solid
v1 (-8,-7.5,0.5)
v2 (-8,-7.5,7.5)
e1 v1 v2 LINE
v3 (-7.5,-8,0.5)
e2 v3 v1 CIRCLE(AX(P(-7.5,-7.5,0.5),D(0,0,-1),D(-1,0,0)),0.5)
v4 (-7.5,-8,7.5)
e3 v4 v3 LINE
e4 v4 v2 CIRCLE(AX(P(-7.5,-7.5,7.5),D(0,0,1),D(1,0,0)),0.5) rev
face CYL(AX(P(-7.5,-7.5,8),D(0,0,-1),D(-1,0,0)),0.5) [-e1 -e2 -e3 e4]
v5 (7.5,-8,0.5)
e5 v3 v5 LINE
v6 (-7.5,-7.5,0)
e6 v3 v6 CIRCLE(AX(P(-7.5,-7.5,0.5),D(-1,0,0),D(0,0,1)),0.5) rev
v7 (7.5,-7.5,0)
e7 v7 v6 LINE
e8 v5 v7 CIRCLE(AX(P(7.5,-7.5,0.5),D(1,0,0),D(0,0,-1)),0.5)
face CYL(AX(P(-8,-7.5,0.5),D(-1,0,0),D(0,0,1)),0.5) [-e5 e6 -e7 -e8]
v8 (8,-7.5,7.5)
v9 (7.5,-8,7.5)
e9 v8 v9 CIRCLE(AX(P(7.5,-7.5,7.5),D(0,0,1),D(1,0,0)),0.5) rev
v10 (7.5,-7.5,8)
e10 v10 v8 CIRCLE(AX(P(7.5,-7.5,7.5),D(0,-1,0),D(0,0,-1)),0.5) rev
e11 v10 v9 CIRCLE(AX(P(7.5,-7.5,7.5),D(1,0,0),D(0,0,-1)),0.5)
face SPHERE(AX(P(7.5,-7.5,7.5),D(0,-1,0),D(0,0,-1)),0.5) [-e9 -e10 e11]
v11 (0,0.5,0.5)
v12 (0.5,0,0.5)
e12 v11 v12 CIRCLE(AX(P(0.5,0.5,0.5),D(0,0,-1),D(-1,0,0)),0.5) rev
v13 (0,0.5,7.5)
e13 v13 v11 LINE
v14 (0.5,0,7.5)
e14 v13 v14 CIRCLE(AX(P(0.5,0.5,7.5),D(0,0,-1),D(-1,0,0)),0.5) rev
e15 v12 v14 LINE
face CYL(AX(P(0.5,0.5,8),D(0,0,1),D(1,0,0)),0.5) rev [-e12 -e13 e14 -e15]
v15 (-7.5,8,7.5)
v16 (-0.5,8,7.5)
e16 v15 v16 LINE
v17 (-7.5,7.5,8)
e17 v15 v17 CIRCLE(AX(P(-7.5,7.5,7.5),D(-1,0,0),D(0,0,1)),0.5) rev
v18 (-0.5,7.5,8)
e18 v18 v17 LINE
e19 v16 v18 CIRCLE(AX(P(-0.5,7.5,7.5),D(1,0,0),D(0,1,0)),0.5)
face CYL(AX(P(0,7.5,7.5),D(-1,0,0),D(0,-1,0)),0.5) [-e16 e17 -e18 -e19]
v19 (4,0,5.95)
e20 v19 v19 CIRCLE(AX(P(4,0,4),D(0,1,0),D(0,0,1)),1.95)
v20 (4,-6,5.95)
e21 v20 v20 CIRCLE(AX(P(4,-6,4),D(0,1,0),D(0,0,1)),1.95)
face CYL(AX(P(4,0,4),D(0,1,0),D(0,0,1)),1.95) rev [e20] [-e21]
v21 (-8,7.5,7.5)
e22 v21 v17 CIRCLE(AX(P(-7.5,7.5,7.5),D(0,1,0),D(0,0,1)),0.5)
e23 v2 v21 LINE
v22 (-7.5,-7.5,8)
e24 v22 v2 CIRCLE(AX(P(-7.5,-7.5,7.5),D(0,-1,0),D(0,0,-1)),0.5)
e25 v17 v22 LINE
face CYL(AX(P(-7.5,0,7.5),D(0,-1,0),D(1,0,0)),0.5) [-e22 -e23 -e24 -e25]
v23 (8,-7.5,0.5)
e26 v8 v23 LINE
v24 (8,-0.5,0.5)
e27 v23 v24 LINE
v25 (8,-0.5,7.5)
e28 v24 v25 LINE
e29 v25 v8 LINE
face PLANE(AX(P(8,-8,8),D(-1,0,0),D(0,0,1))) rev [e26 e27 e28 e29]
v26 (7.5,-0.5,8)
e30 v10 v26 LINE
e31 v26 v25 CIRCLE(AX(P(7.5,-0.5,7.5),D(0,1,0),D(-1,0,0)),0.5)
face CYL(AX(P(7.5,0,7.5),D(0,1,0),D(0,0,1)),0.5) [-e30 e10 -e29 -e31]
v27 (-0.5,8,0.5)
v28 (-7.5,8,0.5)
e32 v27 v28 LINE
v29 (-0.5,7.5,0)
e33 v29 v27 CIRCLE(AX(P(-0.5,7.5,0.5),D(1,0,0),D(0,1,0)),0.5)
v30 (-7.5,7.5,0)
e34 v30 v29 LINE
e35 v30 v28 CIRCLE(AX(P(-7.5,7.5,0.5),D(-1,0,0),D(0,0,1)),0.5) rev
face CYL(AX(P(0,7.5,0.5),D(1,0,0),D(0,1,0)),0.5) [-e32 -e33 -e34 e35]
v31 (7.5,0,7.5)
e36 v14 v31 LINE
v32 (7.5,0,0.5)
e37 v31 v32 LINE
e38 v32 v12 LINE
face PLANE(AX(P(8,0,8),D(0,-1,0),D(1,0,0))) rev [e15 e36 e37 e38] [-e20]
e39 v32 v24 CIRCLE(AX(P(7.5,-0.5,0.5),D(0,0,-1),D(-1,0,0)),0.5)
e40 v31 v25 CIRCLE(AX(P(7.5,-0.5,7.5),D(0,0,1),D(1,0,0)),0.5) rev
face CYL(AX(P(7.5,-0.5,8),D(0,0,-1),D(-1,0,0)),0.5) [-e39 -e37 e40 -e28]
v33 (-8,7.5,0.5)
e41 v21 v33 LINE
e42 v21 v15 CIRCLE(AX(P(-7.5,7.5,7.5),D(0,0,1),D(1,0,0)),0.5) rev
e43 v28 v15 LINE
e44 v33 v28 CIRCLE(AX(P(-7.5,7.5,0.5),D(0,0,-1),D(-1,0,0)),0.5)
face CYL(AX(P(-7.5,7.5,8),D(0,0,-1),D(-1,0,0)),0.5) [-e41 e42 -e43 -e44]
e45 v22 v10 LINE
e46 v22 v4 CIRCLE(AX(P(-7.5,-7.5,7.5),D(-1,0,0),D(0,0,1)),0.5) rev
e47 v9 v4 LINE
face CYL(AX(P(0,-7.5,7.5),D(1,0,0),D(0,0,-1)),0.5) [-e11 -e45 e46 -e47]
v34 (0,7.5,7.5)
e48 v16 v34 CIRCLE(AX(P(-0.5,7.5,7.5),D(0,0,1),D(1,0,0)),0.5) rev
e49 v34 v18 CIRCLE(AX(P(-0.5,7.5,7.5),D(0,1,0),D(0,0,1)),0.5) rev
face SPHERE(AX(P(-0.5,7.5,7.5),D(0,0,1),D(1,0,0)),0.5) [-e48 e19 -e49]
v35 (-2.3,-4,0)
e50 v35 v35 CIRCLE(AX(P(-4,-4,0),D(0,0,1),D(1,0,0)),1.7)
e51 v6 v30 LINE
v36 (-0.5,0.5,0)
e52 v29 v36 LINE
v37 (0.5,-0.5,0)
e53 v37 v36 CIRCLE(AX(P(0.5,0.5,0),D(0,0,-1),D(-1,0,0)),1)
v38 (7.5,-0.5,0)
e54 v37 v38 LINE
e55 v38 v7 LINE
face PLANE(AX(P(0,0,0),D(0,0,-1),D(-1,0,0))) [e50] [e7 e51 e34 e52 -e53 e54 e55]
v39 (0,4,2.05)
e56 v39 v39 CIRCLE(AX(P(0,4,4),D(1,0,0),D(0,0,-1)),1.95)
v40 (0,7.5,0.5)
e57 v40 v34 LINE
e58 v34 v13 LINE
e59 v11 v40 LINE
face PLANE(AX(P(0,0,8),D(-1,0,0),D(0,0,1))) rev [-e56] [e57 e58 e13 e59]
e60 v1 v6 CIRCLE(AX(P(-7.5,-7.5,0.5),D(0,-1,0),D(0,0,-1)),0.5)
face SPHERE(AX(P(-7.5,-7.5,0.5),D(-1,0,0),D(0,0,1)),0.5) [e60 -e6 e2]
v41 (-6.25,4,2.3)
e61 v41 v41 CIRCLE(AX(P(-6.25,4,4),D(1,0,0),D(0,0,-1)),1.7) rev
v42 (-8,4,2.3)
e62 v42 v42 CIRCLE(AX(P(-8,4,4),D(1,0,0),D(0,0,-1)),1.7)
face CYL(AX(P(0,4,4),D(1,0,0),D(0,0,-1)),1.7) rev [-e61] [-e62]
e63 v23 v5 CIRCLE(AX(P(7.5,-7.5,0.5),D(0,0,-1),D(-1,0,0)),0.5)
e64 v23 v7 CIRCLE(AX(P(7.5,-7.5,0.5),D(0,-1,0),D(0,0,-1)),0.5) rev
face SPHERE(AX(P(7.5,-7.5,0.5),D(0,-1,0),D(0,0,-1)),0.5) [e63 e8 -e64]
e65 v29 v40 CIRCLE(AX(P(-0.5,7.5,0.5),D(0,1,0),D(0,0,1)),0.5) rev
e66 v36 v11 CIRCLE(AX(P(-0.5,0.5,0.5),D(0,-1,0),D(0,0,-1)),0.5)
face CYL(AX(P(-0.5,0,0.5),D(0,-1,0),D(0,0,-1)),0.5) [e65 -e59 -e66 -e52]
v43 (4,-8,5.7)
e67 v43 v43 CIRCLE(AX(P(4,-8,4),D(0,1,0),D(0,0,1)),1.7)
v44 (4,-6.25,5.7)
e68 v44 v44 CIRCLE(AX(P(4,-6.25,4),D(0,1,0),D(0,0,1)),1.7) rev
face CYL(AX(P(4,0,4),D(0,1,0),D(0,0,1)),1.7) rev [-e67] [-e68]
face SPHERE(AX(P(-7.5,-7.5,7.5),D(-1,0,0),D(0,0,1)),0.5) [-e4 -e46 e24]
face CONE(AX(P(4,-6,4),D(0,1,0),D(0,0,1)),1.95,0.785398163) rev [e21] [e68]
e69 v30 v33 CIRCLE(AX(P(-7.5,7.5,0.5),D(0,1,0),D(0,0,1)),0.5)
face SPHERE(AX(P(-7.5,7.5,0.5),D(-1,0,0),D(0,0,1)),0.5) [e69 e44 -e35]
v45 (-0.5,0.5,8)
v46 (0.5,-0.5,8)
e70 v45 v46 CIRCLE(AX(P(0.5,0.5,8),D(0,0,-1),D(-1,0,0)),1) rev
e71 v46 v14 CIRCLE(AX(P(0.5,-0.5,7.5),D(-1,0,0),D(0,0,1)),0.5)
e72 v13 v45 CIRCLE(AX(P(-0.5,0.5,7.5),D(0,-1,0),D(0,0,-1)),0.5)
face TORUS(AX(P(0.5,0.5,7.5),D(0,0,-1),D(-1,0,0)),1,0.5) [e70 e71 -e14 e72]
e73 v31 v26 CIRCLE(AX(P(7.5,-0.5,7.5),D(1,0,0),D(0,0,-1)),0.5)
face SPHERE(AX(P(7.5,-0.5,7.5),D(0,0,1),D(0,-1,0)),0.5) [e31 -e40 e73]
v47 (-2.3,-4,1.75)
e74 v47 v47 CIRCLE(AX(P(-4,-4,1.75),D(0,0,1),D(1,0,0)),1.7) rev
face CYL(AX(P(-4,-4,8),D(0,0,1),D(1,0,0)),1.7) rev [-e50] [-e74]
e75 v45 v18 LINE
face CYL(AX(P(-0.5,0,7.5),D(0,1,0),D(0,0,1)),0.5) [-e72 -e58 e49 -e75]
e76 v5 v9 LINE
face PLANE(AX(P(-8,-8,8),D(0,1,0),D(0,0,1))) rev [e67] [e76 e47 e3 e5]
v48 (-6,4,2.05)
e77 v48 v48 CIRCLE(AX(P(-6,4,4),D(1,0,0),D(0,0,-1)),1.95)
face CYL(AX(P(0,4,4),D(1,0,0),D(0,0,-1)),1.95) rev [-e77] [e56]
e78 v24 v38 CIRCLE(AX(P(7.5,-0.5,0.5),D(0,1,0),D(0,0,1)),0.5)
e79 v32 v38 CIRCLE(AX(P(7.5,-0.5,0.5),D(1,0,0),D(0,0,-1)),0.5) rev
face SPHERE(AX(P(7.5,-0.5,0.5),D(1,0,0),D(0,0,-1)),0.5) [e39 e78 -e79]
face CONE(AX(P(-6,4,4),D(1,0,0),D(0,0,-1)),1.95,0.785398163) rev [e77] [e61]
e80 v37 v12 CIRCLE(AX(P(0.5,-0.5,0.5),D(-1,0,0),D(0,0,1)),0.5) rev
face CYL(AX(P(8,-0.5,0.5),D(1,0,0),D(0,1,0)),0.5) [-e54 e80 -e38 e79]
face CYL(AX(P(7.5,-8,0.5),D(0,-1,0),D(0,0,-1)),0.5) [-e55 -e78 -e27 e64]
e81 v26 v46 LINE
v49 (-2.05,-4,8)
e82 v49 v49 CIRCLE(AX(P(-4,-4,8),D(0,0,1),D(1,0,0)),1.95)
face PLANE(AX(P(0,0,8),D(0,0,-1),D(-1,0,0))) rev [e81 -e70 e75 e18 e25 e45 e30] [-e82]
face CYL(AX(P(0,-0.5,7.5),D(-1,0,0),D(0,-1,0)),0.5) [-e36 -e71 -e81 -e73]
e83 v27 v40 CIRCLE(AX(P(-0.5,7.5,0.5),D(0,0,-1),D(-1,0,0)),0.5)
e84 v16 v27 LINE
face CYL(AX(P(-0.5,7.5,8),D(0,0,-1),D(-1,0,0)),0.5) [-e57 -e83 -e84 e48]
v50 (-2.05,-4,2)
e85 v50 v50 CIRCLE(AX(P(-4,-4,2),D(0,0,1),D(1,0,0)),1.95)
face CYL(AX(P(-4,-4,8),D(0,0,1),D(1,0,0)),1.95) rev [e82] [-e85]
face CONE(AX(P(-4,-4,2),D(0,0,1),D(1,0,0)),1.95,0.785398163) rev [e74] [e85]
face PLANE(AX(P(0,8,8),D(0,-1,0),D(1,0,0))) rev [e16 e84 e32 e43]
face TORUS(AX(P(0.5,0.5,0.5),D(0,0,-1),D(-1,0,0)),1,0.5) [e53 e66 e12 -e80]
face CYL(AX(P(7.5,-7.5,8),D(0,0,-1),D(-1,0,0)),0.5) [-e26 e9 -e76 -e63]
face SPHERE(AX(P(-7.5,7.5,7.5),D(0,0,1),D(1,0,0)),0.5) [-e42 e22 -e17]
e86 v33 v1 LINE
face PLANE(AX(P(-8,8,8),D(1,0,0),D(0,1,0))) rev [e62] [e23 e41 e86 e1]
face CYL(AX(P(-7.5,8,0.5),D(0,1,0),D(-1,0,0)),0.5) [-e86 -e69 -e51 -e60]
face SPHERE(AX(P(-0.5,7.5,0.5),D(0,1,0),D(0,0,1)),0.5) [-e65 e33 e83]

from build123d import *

# Parameters (mm, degrees)
BOSS_EXTRUDE1_DEPTH                      = 8
F_3_9_3_9_DIAMETER_HOLE1_D               = 3.9
F_3_9_3_9_DIAMETER_HOLE1_DEPTH           = 6
F_3_9_3_9_DIAMETER_HOLE1_TIP             = 1.95
F_3_9_3_9_DIAMETER_HOLE1_ON_FACE_2_D     = 3.9
F_3_9_3_9_DIAMETER_HOLE1_ON_FACE_2_DEPTH = 6
F_3_9_3_9_DIAMETER_HOLE1_ON_FACE_2_TIP   = 1.95
F_3_9_3_9_DIAMETER_HOLE1_ON_FACE_3_D     = 3.9
F_3_9_3_9_DIAMETER_HOLE1_ON_FACE_3_DEPTH = 6
F_3_9_3_9_DIAMETER_HOLE1_ON_FACE_3_TIP   = 1.95
F_3_4_START                              = -8
F_3_4_3_4_DIAMETER_HOLE1_OUTLINE_R       = 1.7
F_3_4_3_4_DIAMETER_HOLE1_DEPTH           = 1.7500001
F_3_4_3_4_DIAMETER_HOLE1_2_OUTLINE_R     = 1.7
F_3_4_3_4_DIAMETER_HOLE1_2_DEPTH         = 1.7500001
F_3_4_3_4_DIAMETER_HOLE1_3_OUTLINE_R     = 1.7
F_3_4_3_4_DIAMETER_HOLE1_3_DEPTH         = 1.7500001
FILLET1_R                                = 0.5


# Read off the part's stored shape, not the designer's step: Ø3.4 (3.4) Diameter Hole1
with BuildPart() as part:
    # Sketch1 → Boss-Extrude1 (new body)
    with BuildSketch(Plane.XY):
        Polygon((0, 0), (0, 8), (-8, 8), (-8, -8), (8, -8), (8, 0), align=None)
    extrude(amount=BOSS_EXTRUDE1_DEPTH)

    # Ø3.9 (3.9) Diameter Hole1
    with Locations(Plane(origin=(-4, -4, 8), x_dir=(1, 0, 0), z_dir=(0, 0, 1))):
        with Locations((0, 0)):
            Hole(F_3_9_3_9_DIAMETER_HOLE1_D / 2, depth=F_3_9_3_9_DIAMETER_HOLE1_DEPTH)
            with Locations((0, 0, -(F_3_9_3_9_DIAMETER_HOLE1_DEPTH + F_3_9_3_9_DIAMETER_HOLE1_TIP / 2))):  # 90° drill point
                Cone(0, F_3_9_3_9_DIAMETER_HOLE1_D / 2, F_3_9_3_9_DIAMETER_HOLE1_TIP, mode=Mode.SUBTRACT)

    # Ø3.9 (3.9) Diameter Hole1 on face 2
    with Locations(Plane(origin=(0, 4, 4), x_dir=(0, 0, 1), z_dir=(1, 0, 0))):
        with Locations((0, 0)):
            Hole(F_3_9_3_9_DIAMETER_HOLE1_ON_FACE_2_D / 2, depth=F_3_9_3_9_DIAMETER_HOLE1_ON_FACE_2_DEPTH)
            with Locations((0, 0, -(F_3_9_3_9_DIAMETER_HOLE1_ON_FACE_2_DEPTH + F_3_9_3_9_DIAMETER_HOLE1_ON_FACE_2_TIP / 2))):  # 90° drill point
                Cone(0, F_3_9_3_9_DIAMETER_HOLE1_ON_FACE_2_D / 2, F_3_9_3_9_DIAMETER_HOLE1_ON_FACE_2_TIP, mode=Mode.SUBTRACT)

    # Ø3.9 (3.9) Diameter Hole1 on face 3
    with Locations(Plane(origin=(4, 0, 4), x_dir=(0, 0, 1), z_dir=(0, 1, 0))):
        with Locations((0, 0)):
            Hole(F_3_9_3_9_DIAMETER_HOLE1_ON_FACE_3_D / 2, depth=F_3_9_3_9_DIAMETER_HOLE1_ON_FACE_3_DEPTH)
            with Locations((0, 0, -(F_3_9_3_9_DIAMETER_HOLE1_ON_FACE_3_DEPTH + F_3_9_3_9_DIAMETER_HOLE1_ON_FACE_3_TIP / 2))):  # 90° drill point
                Cone(0, F_3_9_3_9_DIAMETER_HOLE1_ON_FACE_3_D / 2, F_3_9_3_9_DIAMETER_HOLE1_ON_FACE_3_TIP, mode=Mode.SUBTRACT)

    # Ø3.4 (3.4) Diameter Hole1 outline → Ø3.4 (3.4) Diameter Hole1 (cut)
    with BuildSketch(Plane(origin=(0, 0, 0), x_dir=(1, 0, 0), z_dir=(0, 1, 0)).offset(F_3_4_START)):
        with Locations((4, -4)):
            Circle(F_3_4_3_4_DIAMETER_HOLE1_OUTLINE_R)
    extrude(amount=F_3_4_3_4_DIAMETER_HOLE1_DEPTH, mode=Mode.SUBTRACT)

    # 3.4 _3.4_ Diameter Hole1 2 outline → 3.4 _3.4_ Diameter Hole1 2 (cut)
    with BuildSketch(Plane.YZ.offset(F_3_4_START)):
        with Locations((4, 4)):
            Circle(F_3_4_3_4_DIAMETER_HOLE1_2_OUTLINE_R)
    extrude(amount=F_3_4_3_4_DIAMETER_HOLE1_2_DEPTH, mode=Mode.SUBTRACT)

    # 3.4 _3.4_ Diameter Hole1 3 outline → 3.4 _3.4_ Diameter Hole1 3 (cut)
    with BuildSketch(Plane.XY):
        with Locations((-4, -4)):
            Circle(F_3_4_3_4_DIAMETER_HOLE1_3_OUTLINE_R)
    extrude(amount=F_3_4_3_4_DIAMETER_HOLE1_3_DEPTH, mode=Mode.SUBTRACT)

    # Fillet1
    fillet1_edges = [part.edges().sort_by_distance(p)[0] for p in [
        (8, 0, 4),
        (8, -8, 4),
        (-8, -8, 4),
        (-8, 8, 4),
        (0, 8, 4),
        (0, 0, 4),
        (-4, 8, 8),
        (-8, 0, 8),
        (0, -8, 8),
        (8, -4, 8),
        (4, 0, 8),
        (8, -4, 0),
        (0, -8, 0),
        (-8, 0, 0),
        (-4, 8, 0),
        (0, 4, 0),
        (4, 0, 0),
        (0, 4, 8),
    ]]
    fillet(fillet1_edges, radius=FILLET1_R)


solid = part.part
